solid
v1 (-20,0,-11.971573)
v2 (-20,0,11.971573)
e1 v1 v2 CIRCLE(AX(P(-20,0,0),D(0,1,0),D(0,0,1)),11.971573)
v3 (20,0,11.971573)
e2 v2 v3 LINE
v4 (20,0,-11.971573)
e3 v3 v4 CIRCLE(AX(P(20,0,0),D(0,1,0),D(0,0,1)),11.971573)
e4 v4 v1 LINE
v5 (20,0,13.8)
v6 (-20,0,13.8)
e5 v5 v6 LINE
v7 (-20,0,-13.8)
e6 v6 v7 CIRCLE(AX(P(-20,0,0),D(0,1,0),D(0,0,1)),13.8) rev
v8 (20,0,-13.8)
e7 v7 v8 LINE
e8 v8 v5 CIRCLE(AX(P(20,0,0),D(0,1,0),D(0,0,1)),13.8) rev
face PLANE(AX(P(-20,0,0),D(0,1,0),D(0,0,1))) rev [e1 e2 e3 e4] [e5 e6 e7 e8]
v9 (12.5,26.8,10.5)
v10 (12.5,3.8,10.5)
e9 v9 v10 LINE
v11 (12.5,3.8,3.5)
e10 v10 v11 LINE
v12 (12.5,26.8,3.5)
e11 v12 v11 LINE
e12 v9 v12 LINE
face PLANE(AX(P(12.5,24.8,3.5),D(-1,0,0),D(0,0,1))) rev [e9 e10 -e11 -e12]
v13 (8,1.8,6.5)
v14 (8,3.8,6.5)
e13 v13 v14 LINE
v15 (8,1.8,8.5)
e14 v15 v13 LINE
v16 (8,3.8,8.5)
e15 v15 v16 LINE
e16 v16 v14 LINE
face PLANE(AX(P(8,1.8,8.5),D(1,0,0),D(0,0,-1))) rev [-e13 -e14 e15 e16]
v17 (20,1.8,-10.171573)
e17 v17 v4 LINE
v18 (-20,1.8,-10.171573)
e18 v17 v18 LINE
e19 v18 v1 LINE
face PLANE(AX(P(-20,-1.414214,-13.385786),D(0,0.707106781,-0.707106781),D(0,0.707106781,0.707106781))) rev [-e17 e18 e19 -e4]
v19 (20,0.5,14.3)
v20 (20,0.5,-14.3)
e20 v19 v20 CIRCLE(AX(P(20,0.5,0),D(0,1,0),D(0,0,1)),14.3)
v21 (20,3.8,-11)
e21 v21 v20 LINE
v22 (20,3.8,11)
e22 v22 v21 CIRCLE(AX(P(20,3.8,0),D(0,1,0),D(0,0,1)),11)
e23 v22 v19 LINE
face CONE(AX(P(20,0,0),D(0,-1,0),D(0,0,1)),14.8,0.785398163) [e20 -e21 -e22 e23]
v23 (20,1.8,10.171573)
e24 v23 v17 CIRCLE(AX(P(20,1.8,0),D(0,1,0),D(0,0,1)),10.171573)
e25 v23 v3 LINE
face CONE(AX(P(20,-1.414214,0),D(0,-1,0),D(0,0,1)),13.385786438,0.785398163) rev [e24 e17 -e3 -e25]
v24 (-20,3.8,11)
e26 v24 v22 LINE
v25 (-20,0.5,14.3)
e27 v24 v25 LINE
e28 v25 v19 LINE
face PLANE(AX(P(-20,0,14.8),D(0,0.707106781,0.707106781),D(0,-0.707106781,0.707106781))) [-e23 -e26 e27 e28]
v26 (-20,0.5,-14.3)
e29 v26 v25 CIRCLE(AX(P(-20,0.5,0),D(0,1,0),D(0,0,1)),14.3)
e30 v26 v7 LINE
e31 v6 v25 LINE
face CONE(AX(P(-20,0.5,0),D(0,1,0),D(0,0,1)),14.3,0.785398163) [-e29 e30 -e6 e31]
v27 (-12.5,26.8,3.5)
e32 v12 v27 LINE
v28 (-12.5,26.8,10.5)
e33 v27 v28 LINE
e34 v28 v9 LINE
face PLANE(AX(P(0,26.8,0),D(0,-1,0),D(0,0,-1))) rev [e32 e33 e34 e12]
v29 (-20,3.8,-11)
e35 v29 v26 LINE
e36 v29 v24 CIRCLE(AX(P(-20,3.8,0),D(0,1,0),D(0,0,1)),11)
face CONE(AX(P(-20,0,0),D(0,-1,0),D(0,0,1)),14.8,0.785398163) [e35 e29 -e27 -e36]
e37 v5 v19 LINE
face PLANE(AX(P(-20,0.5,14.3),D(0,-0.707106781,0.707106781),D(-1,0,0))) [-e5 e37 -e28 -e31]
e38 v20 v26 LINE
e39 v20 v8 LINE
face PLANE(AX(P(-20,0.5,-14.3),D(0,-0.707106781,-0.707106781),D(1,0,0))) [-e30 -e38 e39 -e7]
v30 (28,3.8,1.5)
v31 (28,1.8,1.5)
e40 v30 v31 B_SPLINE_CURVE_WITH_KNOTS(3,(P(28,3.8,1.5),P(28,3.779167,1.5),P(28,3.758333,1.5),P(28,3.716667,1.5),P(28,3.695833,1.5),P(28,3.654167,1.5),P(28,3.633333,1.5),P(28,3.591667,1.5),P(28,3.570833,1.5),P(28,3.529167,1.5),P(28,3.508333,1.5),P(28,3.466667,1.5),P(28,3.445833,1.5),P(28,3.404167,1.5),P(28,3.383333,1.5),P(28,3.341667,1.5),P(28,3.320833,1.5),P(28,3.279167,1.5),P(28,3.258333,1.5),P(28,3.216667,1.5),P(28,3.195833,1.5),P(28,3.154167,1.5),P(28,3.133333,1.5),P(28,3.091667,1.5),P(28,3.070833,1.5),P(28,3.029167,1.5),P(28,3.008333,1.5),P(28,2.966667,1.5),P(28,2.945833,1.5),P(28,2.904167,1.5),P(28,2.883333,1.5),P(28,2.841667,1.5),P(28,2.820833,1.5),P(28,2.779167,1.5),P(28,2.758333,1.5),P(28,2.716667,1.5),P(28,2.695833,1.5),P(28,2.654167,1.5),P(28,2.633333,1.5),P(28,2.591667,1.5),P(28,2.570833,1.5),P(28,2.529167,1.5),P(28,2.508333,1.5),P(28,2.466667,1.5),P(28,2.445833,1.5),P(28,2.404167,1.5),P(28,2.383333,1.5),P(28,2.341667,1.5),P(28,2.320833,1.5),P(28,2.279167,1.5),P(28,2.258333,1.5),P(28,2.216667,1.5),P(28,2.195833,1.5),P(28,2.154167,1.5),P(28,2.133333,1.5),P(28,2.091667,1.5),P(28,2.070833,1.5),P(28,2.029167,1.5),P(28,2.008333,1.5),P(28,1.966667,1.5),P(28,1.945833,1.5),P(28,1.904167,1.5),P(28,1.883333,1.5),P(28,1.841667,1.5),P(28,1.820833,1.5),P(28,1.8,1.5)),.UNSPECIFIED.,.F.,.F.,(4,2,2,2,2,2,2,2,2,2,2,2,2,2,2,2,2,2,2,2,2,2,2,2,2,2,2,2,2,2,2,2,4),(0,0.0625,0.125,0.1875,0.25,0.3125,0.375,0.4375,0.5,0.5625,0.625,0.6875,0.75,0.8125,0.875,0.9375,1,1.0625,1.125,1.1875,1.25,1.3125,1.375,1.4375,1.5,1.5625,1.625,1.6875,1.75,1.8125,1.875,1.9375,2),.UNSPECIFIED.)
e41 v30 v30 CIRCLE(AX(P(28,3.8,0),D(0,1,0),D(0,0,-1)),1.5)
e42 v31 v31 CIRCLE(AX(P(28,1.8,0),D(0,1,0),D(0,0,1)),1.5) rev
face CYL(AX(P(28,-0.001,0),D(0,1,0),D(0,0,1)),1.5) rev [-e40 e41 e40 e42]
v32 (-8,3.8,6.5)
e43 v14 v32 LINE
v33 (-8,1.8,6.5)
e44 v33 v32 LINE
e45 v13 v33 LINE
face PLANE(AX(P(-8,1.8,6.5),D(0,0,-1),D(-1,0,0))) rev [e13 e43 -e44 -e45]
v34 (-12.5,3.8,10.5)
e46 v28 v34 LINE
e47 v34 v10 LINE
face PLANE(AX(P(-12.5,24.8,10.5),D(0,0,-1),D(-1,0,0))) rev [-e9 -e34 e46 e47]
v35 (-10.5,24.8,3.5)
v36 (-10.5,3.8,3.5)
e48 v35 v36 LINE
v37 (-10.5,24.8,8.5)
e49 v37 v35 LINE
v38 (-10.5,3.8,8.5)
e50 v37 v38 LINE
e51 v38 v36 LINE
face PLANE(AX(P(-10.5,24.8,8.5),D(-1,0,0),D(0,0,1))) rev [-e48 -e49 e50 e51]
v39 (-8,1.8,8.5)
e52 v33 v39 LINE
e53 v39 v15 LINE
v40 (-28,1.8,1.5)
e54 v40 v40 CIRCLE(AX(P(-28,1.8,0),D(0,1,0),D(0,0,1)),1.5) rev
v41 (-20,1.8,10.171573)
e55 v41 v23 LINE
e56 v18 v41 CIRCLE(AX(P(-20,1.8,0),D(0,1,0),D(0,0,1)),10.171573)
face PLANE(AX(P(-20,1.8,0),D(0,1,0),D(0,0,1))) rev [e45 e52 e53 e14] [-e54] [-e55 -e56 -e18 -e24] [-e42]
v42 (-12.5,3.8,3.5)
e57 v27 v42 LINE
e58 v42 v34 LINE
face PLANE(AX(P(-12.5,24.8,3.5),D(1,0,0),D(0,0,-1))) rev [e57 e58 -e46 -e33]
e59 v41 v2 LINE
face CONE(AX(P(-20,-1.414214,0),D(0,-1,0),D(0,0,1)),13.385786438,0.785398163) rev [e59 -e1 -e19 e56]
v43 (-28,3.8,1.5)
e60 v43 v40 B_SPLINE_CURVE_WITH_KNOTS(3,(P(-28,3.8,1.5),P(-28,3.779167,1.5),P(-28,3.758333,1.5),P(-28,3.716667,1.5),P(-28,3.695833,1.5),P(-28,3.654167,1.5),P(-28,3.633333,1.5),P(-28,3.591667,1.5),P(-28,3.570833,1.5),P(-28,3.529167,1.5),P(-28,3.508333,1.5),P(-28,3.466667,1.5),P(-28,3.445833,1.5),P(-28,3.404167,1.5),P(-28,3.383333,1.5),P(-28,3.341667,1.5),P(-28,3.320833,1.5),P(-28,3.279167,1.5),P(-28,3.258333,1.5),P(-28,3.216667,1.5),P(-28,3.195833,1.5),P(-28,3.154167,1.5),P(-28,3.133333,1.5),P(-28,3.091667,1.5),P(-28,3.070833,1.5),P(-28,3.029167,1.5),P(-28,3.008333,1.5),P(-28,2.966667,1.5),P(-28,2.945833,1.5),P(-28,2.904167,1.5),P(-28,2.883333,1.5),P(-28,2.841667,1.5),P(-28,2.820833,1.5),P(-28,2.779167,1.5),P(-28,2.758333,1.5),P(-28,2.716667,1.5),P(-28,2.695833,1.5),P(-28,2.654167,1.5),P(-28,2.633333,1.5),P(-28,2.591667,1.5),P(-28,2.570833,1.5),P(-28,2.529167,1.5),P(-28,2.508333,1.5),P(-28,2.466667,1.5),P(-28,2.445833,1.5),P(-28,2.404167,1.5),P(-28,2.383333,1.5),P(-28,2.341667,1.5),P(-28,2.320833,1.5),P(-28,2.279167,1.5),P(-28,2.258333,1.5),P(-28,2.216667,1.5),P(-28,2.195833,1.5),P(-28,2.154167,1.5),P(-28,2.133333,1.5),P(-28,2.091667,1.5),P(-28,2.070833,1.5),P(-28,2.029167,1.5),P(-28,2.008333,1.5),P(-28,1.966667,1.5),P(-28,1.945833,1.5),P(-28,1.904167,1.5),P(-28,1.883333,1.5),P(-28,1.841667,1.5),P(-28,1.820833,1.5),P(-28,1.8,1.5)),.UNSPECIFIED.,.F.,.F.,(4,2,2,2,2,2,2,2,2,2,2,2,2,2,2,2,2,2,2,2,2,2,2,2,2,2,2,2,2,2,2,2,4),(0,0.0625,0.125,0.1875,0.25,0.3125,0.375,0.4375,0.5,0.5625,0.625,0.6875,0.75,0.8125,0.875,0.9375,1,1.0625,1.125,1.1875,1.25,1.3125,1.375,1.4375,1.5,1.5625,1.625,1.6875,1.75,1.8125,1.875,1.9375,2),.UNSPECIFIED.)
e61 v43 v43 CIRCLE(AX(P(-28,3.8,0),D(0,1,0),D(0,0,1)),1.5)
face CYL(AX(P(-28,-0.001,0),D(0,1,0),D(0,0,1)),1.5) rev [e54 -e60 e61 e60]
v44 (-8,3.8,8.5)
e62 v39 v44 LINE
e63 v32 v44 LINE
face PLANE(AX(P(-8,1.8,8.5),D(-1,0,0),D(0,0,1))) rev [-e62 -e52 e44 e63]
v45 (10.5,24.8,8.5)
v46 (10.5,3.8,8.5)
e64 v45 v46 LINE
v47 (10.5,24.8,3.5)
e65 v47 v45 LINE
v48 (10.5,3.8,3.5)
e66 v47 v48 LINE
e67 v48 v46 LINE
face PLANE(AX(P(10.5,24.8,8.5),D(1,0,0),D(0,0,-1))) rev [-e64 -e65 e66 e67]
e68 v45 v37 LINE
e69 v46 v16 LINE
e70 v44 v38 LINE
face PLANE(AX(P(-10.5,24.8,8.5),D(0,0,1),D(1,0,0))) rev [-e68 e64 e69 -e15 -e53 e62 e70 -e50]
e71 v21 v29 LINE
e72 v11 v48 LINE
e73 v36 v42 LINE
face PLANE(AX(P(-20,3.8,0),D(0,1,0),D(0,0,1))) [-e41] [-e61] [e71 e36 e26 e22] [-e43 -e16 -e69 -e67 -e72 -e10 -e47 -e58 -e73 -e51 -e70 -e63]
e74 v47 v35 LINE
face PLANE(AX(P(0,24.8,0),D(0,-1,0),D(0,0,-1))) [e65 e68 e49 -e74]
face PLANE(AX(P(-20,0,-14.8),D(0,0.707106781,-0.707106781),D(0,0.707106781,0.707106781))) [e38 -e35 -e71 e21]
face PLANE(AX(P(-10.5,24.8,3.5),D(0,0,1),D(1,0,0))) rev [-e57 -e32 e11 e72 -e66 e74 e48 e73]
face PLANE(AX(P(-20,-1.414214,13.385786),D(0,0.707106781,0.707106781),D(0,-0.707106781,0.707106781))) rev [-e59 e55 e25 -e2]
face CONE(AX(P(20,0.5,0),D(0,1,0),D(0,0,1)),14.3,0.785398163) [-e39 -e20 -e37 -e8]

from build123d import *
from OCP.BRepFilletAPI import BRepFilletAPI_MakeChamfer

# Parameters (mm, degrees)
BOSS_EXTRU_1_DEPTH      = 3.8
BOSS_EXTRU_1_TAPER      = 45
COQUE2_DEPTH            = 1.8
COQUE2_DRAFT            = 45
CHANFREIN1_SIZE         = 1
CHANFREIN1_SIZE2        = 0.707106781
ENL_V_MAT_EXTRU_1_REACH = 39.355
ESQUISSE2_R             = 1.5
BOSS_EXTRU_2_DEPTH      = 21
ESQUISSE5_W             = 25
ESQUISSE5_H             = 7
BOSS_EXTRU_3_DEPTH      = 2
ESQUISSE6_W             = 16
ESQUISSE6_H             = 2
ENL_V_MAT_EXTRU_2_DEPTH = 2


# Read off the part's stored shape, not the designer's step: Coque2
with BuildPart() as part:
    # Esquisse1 → Boss.-Extru.1 (new body)
    with BuildSketch(Plane(origin=(0, 0, 0), x_dir=(1, 0, 0), z_dir=(0, 1, 0))):
        with BuildLine():
            ThreePointArc((-20, 14.8), (-34.8, 0), (-20, -14.8))
            Line((-20, -14.8), (20, -14.8))
            ThreePointArc((20, -14.8), (34.8, 0), (20, 14.8))
            Line((20, 14.8), (-20, 14.8))
        make_face()
    extrude(amount=BOSS_EXTRU_1_DEPTH, taper=BOSS_EXTRU_1_TAPER)


with BuildPart() as coque2_tool:
    # Coque2 outline → Coque2 (with draft: the straight prism first)
    with BuildSketch(Plane(origin=(0, 1.8, 0), x_dir=(1, 0, 0), z_dir=(0, 1, 0))):
        with BuildLine():
            Line((-20, -10.171572875), (20, -10.171572875))
            ThreePointArc((20, -10.171572875), (30.171572875, 0), (20, 10.171572875))
            Line((20, 10.171572875), (-20, 10.171572875))
            ThreePointArc((-20, 10.171572875), (-30.171572875, 0), (-20, -10.171572875))
        make_face()
    extrude(amount=-COQUE2_DEPTH)
    # Coque2: the draft: its side faces are tilted about the plane it starts from
    coque2_sides = [coque2_tool.faces().sort_by_distance(p)[0] for p in [
        (0, 0.9, 10.171572875),
        (30.171572875, 0.9, 0),
        (0, 0.9, -10.171572875),
        (-30.171572875, 0.9, 0),
    ]]
    draft(coque2_sides, Plane(origin=(0, 1.8, 0), x_dir=(1, 0, 0), z_dir=(0, 1, 0)), COQUE2_DRAFT)


with BuildPart() as part_1:
    add(part.part)

    # Coque2: cut by coque2_tool
    add(coque2_tool.part, mode=Mode.SUBTRACT)

    # Chanfrein1: one chamfer whose edges measure the first distance from different faces: ONE call of the kernel's chamfer builder (chamfer() names one face for all edges)
    chanfrein1_edges_1 = [part_1.edges().sort_by_distance(p)[0] for p in [
        (0, 0, -14.8),
        (0, 0, 14.8),
        (-34.8, 0, 0),
    ]]
    chanfrein1_side_1 = [part_1.faces().sort_by_distance(p)[0] for p in [
        (0, 0, -14.043672029),
    ]]
    chanfrein1_edges_2 = [part_1.edges().sort_by_distance(p)[0] for p in [
        (34.8, 0, 0),
    ]]
    chanfrein1_side_2 = [part_1.faces().sort_by_distance(p)[0] for p in [
        (32.9, 1.9, 0),
    ]]
    chanfrein1 = BRepFilletAPI_MakeChamfer(part_1.part.solid().wrapped)
    for e in chanfrein1_edges_1:
        chanfrein1.Add(CHANFREIN1_SIZE, CHANFREIN1_SIZE2, e.wrapped, chanfrein1_side_1[0].wrapped)  # the first distance lies on this face
    for e in chanfrein1_edges_2:
        chanfrein1.Add(CHANFREIN1_SIZE, CHANFREIN1_SIZE2, e.wrapped, chanfrein1_side_2[0].wrapped)  # the first distance lies on this face
    add(Compound.cast(chanfrein1.Shape()), mode=Mode.REPLACE)

    # Esquisse2 → Enlèv. mat.-Extru.1 (cut, up to next)
    with BuildSketch(Plane(origin=(0, 3.8, 0), x_dir=(1, 0, 0), z_dir=(0, 1, 0)), mode=Mode.PRIVATE) as enl_v_mat_extru_1_sk1:
        with Locations(Location((-28, 0, 0), (0, 0, 270))):
            Circle(ESQUISSE2_R)
    enl_v_mat_extru_1_tool1 = extrude(enl_v_mat_extru_1_sk1.sketch, amount=-ENL_V_MAT_EXTRU_1_REACH, mode=Mode.PRIVATE) & part_1.part
    # Esquisse2 → Enlèv. mat.-Extru.1 (cut, up to next)
    with BuildSketch(Plane(origin=(0, 3.8, 0), x_dir=(1, 0, 0), z_dir=(0, 1, 0)), mode=Mode.PRIVATE) as enl_v_mat_extru_1_sk2:
        with Locations(Location((28, 0, 0), (0, 0, 270))):
            Circle(ESQUISSE2_R)
    enl_v_mat_extru_1_tool2 = extrude(enl_v_mat_extru_1_sk2.sketch, amount=-ENL_V_MAT_EXTRU_1_REACH, mode=Mode.PRIVATE) & part_1.part
    add(enl_v_mat_extru_1_tool1.solids().sort_by_distance((-28, 3.8, 0))[0], mode=Mode.SUBTRACT)
    add(enl_v_mat_extru_1_tool2.solids().sort_by_distance((28, 3.8, 0))[0], mode=Mode.SUBTRACT)

    # Esquisse3 → Boss.-Extru.2 (add)
    with BuildSketch(Plane(origin=(0, 3.8, 0), x_dir=(1, 0, 0), z_dir=(0, 1, 0))):
        Polygon((-10.5, -8.5), (10.5, -8.5), (10.5, -3.5), (12.5, -3.5), (12.5, -10.5), (-12.5, -10.5), (-12.5, -3.5), (-10.5, -3.5), align=None)
    extrude(amount=BOSS_EXTRU_2_DEPTH)

    # Esquisse5 → Boss.-Extru.3 (add)
    with BuildSketch(Plane(origin=(0, 24.8, 0), x_dir=(1, 0, 0), z_dir=(0, 1, 0))):
        with Locations((0, -7)):
            Rectangle(ESQUISSE5_W, ESQUISSE5_H)
    extrude(amount=BOSS_EXTRU_3_DEPTH)

    # Esquisse6 → Enlèv. mat.-Extru.2 (cut)
    with BuildSketch(Plane(origin=(0, 3.8, 0), x_dir=(1, 0, 0), z_dir=(0, 1, 0))):
        with Locations((0, -7.5)):
            Rectangle(ESQUISSE6_W, ESQUISSE6_H)
    extrude(amount=-ENL_V_MAT_EXTRU_2_DEPTH, mode=Mode.SUBTRACT)


solid = part_1.part
